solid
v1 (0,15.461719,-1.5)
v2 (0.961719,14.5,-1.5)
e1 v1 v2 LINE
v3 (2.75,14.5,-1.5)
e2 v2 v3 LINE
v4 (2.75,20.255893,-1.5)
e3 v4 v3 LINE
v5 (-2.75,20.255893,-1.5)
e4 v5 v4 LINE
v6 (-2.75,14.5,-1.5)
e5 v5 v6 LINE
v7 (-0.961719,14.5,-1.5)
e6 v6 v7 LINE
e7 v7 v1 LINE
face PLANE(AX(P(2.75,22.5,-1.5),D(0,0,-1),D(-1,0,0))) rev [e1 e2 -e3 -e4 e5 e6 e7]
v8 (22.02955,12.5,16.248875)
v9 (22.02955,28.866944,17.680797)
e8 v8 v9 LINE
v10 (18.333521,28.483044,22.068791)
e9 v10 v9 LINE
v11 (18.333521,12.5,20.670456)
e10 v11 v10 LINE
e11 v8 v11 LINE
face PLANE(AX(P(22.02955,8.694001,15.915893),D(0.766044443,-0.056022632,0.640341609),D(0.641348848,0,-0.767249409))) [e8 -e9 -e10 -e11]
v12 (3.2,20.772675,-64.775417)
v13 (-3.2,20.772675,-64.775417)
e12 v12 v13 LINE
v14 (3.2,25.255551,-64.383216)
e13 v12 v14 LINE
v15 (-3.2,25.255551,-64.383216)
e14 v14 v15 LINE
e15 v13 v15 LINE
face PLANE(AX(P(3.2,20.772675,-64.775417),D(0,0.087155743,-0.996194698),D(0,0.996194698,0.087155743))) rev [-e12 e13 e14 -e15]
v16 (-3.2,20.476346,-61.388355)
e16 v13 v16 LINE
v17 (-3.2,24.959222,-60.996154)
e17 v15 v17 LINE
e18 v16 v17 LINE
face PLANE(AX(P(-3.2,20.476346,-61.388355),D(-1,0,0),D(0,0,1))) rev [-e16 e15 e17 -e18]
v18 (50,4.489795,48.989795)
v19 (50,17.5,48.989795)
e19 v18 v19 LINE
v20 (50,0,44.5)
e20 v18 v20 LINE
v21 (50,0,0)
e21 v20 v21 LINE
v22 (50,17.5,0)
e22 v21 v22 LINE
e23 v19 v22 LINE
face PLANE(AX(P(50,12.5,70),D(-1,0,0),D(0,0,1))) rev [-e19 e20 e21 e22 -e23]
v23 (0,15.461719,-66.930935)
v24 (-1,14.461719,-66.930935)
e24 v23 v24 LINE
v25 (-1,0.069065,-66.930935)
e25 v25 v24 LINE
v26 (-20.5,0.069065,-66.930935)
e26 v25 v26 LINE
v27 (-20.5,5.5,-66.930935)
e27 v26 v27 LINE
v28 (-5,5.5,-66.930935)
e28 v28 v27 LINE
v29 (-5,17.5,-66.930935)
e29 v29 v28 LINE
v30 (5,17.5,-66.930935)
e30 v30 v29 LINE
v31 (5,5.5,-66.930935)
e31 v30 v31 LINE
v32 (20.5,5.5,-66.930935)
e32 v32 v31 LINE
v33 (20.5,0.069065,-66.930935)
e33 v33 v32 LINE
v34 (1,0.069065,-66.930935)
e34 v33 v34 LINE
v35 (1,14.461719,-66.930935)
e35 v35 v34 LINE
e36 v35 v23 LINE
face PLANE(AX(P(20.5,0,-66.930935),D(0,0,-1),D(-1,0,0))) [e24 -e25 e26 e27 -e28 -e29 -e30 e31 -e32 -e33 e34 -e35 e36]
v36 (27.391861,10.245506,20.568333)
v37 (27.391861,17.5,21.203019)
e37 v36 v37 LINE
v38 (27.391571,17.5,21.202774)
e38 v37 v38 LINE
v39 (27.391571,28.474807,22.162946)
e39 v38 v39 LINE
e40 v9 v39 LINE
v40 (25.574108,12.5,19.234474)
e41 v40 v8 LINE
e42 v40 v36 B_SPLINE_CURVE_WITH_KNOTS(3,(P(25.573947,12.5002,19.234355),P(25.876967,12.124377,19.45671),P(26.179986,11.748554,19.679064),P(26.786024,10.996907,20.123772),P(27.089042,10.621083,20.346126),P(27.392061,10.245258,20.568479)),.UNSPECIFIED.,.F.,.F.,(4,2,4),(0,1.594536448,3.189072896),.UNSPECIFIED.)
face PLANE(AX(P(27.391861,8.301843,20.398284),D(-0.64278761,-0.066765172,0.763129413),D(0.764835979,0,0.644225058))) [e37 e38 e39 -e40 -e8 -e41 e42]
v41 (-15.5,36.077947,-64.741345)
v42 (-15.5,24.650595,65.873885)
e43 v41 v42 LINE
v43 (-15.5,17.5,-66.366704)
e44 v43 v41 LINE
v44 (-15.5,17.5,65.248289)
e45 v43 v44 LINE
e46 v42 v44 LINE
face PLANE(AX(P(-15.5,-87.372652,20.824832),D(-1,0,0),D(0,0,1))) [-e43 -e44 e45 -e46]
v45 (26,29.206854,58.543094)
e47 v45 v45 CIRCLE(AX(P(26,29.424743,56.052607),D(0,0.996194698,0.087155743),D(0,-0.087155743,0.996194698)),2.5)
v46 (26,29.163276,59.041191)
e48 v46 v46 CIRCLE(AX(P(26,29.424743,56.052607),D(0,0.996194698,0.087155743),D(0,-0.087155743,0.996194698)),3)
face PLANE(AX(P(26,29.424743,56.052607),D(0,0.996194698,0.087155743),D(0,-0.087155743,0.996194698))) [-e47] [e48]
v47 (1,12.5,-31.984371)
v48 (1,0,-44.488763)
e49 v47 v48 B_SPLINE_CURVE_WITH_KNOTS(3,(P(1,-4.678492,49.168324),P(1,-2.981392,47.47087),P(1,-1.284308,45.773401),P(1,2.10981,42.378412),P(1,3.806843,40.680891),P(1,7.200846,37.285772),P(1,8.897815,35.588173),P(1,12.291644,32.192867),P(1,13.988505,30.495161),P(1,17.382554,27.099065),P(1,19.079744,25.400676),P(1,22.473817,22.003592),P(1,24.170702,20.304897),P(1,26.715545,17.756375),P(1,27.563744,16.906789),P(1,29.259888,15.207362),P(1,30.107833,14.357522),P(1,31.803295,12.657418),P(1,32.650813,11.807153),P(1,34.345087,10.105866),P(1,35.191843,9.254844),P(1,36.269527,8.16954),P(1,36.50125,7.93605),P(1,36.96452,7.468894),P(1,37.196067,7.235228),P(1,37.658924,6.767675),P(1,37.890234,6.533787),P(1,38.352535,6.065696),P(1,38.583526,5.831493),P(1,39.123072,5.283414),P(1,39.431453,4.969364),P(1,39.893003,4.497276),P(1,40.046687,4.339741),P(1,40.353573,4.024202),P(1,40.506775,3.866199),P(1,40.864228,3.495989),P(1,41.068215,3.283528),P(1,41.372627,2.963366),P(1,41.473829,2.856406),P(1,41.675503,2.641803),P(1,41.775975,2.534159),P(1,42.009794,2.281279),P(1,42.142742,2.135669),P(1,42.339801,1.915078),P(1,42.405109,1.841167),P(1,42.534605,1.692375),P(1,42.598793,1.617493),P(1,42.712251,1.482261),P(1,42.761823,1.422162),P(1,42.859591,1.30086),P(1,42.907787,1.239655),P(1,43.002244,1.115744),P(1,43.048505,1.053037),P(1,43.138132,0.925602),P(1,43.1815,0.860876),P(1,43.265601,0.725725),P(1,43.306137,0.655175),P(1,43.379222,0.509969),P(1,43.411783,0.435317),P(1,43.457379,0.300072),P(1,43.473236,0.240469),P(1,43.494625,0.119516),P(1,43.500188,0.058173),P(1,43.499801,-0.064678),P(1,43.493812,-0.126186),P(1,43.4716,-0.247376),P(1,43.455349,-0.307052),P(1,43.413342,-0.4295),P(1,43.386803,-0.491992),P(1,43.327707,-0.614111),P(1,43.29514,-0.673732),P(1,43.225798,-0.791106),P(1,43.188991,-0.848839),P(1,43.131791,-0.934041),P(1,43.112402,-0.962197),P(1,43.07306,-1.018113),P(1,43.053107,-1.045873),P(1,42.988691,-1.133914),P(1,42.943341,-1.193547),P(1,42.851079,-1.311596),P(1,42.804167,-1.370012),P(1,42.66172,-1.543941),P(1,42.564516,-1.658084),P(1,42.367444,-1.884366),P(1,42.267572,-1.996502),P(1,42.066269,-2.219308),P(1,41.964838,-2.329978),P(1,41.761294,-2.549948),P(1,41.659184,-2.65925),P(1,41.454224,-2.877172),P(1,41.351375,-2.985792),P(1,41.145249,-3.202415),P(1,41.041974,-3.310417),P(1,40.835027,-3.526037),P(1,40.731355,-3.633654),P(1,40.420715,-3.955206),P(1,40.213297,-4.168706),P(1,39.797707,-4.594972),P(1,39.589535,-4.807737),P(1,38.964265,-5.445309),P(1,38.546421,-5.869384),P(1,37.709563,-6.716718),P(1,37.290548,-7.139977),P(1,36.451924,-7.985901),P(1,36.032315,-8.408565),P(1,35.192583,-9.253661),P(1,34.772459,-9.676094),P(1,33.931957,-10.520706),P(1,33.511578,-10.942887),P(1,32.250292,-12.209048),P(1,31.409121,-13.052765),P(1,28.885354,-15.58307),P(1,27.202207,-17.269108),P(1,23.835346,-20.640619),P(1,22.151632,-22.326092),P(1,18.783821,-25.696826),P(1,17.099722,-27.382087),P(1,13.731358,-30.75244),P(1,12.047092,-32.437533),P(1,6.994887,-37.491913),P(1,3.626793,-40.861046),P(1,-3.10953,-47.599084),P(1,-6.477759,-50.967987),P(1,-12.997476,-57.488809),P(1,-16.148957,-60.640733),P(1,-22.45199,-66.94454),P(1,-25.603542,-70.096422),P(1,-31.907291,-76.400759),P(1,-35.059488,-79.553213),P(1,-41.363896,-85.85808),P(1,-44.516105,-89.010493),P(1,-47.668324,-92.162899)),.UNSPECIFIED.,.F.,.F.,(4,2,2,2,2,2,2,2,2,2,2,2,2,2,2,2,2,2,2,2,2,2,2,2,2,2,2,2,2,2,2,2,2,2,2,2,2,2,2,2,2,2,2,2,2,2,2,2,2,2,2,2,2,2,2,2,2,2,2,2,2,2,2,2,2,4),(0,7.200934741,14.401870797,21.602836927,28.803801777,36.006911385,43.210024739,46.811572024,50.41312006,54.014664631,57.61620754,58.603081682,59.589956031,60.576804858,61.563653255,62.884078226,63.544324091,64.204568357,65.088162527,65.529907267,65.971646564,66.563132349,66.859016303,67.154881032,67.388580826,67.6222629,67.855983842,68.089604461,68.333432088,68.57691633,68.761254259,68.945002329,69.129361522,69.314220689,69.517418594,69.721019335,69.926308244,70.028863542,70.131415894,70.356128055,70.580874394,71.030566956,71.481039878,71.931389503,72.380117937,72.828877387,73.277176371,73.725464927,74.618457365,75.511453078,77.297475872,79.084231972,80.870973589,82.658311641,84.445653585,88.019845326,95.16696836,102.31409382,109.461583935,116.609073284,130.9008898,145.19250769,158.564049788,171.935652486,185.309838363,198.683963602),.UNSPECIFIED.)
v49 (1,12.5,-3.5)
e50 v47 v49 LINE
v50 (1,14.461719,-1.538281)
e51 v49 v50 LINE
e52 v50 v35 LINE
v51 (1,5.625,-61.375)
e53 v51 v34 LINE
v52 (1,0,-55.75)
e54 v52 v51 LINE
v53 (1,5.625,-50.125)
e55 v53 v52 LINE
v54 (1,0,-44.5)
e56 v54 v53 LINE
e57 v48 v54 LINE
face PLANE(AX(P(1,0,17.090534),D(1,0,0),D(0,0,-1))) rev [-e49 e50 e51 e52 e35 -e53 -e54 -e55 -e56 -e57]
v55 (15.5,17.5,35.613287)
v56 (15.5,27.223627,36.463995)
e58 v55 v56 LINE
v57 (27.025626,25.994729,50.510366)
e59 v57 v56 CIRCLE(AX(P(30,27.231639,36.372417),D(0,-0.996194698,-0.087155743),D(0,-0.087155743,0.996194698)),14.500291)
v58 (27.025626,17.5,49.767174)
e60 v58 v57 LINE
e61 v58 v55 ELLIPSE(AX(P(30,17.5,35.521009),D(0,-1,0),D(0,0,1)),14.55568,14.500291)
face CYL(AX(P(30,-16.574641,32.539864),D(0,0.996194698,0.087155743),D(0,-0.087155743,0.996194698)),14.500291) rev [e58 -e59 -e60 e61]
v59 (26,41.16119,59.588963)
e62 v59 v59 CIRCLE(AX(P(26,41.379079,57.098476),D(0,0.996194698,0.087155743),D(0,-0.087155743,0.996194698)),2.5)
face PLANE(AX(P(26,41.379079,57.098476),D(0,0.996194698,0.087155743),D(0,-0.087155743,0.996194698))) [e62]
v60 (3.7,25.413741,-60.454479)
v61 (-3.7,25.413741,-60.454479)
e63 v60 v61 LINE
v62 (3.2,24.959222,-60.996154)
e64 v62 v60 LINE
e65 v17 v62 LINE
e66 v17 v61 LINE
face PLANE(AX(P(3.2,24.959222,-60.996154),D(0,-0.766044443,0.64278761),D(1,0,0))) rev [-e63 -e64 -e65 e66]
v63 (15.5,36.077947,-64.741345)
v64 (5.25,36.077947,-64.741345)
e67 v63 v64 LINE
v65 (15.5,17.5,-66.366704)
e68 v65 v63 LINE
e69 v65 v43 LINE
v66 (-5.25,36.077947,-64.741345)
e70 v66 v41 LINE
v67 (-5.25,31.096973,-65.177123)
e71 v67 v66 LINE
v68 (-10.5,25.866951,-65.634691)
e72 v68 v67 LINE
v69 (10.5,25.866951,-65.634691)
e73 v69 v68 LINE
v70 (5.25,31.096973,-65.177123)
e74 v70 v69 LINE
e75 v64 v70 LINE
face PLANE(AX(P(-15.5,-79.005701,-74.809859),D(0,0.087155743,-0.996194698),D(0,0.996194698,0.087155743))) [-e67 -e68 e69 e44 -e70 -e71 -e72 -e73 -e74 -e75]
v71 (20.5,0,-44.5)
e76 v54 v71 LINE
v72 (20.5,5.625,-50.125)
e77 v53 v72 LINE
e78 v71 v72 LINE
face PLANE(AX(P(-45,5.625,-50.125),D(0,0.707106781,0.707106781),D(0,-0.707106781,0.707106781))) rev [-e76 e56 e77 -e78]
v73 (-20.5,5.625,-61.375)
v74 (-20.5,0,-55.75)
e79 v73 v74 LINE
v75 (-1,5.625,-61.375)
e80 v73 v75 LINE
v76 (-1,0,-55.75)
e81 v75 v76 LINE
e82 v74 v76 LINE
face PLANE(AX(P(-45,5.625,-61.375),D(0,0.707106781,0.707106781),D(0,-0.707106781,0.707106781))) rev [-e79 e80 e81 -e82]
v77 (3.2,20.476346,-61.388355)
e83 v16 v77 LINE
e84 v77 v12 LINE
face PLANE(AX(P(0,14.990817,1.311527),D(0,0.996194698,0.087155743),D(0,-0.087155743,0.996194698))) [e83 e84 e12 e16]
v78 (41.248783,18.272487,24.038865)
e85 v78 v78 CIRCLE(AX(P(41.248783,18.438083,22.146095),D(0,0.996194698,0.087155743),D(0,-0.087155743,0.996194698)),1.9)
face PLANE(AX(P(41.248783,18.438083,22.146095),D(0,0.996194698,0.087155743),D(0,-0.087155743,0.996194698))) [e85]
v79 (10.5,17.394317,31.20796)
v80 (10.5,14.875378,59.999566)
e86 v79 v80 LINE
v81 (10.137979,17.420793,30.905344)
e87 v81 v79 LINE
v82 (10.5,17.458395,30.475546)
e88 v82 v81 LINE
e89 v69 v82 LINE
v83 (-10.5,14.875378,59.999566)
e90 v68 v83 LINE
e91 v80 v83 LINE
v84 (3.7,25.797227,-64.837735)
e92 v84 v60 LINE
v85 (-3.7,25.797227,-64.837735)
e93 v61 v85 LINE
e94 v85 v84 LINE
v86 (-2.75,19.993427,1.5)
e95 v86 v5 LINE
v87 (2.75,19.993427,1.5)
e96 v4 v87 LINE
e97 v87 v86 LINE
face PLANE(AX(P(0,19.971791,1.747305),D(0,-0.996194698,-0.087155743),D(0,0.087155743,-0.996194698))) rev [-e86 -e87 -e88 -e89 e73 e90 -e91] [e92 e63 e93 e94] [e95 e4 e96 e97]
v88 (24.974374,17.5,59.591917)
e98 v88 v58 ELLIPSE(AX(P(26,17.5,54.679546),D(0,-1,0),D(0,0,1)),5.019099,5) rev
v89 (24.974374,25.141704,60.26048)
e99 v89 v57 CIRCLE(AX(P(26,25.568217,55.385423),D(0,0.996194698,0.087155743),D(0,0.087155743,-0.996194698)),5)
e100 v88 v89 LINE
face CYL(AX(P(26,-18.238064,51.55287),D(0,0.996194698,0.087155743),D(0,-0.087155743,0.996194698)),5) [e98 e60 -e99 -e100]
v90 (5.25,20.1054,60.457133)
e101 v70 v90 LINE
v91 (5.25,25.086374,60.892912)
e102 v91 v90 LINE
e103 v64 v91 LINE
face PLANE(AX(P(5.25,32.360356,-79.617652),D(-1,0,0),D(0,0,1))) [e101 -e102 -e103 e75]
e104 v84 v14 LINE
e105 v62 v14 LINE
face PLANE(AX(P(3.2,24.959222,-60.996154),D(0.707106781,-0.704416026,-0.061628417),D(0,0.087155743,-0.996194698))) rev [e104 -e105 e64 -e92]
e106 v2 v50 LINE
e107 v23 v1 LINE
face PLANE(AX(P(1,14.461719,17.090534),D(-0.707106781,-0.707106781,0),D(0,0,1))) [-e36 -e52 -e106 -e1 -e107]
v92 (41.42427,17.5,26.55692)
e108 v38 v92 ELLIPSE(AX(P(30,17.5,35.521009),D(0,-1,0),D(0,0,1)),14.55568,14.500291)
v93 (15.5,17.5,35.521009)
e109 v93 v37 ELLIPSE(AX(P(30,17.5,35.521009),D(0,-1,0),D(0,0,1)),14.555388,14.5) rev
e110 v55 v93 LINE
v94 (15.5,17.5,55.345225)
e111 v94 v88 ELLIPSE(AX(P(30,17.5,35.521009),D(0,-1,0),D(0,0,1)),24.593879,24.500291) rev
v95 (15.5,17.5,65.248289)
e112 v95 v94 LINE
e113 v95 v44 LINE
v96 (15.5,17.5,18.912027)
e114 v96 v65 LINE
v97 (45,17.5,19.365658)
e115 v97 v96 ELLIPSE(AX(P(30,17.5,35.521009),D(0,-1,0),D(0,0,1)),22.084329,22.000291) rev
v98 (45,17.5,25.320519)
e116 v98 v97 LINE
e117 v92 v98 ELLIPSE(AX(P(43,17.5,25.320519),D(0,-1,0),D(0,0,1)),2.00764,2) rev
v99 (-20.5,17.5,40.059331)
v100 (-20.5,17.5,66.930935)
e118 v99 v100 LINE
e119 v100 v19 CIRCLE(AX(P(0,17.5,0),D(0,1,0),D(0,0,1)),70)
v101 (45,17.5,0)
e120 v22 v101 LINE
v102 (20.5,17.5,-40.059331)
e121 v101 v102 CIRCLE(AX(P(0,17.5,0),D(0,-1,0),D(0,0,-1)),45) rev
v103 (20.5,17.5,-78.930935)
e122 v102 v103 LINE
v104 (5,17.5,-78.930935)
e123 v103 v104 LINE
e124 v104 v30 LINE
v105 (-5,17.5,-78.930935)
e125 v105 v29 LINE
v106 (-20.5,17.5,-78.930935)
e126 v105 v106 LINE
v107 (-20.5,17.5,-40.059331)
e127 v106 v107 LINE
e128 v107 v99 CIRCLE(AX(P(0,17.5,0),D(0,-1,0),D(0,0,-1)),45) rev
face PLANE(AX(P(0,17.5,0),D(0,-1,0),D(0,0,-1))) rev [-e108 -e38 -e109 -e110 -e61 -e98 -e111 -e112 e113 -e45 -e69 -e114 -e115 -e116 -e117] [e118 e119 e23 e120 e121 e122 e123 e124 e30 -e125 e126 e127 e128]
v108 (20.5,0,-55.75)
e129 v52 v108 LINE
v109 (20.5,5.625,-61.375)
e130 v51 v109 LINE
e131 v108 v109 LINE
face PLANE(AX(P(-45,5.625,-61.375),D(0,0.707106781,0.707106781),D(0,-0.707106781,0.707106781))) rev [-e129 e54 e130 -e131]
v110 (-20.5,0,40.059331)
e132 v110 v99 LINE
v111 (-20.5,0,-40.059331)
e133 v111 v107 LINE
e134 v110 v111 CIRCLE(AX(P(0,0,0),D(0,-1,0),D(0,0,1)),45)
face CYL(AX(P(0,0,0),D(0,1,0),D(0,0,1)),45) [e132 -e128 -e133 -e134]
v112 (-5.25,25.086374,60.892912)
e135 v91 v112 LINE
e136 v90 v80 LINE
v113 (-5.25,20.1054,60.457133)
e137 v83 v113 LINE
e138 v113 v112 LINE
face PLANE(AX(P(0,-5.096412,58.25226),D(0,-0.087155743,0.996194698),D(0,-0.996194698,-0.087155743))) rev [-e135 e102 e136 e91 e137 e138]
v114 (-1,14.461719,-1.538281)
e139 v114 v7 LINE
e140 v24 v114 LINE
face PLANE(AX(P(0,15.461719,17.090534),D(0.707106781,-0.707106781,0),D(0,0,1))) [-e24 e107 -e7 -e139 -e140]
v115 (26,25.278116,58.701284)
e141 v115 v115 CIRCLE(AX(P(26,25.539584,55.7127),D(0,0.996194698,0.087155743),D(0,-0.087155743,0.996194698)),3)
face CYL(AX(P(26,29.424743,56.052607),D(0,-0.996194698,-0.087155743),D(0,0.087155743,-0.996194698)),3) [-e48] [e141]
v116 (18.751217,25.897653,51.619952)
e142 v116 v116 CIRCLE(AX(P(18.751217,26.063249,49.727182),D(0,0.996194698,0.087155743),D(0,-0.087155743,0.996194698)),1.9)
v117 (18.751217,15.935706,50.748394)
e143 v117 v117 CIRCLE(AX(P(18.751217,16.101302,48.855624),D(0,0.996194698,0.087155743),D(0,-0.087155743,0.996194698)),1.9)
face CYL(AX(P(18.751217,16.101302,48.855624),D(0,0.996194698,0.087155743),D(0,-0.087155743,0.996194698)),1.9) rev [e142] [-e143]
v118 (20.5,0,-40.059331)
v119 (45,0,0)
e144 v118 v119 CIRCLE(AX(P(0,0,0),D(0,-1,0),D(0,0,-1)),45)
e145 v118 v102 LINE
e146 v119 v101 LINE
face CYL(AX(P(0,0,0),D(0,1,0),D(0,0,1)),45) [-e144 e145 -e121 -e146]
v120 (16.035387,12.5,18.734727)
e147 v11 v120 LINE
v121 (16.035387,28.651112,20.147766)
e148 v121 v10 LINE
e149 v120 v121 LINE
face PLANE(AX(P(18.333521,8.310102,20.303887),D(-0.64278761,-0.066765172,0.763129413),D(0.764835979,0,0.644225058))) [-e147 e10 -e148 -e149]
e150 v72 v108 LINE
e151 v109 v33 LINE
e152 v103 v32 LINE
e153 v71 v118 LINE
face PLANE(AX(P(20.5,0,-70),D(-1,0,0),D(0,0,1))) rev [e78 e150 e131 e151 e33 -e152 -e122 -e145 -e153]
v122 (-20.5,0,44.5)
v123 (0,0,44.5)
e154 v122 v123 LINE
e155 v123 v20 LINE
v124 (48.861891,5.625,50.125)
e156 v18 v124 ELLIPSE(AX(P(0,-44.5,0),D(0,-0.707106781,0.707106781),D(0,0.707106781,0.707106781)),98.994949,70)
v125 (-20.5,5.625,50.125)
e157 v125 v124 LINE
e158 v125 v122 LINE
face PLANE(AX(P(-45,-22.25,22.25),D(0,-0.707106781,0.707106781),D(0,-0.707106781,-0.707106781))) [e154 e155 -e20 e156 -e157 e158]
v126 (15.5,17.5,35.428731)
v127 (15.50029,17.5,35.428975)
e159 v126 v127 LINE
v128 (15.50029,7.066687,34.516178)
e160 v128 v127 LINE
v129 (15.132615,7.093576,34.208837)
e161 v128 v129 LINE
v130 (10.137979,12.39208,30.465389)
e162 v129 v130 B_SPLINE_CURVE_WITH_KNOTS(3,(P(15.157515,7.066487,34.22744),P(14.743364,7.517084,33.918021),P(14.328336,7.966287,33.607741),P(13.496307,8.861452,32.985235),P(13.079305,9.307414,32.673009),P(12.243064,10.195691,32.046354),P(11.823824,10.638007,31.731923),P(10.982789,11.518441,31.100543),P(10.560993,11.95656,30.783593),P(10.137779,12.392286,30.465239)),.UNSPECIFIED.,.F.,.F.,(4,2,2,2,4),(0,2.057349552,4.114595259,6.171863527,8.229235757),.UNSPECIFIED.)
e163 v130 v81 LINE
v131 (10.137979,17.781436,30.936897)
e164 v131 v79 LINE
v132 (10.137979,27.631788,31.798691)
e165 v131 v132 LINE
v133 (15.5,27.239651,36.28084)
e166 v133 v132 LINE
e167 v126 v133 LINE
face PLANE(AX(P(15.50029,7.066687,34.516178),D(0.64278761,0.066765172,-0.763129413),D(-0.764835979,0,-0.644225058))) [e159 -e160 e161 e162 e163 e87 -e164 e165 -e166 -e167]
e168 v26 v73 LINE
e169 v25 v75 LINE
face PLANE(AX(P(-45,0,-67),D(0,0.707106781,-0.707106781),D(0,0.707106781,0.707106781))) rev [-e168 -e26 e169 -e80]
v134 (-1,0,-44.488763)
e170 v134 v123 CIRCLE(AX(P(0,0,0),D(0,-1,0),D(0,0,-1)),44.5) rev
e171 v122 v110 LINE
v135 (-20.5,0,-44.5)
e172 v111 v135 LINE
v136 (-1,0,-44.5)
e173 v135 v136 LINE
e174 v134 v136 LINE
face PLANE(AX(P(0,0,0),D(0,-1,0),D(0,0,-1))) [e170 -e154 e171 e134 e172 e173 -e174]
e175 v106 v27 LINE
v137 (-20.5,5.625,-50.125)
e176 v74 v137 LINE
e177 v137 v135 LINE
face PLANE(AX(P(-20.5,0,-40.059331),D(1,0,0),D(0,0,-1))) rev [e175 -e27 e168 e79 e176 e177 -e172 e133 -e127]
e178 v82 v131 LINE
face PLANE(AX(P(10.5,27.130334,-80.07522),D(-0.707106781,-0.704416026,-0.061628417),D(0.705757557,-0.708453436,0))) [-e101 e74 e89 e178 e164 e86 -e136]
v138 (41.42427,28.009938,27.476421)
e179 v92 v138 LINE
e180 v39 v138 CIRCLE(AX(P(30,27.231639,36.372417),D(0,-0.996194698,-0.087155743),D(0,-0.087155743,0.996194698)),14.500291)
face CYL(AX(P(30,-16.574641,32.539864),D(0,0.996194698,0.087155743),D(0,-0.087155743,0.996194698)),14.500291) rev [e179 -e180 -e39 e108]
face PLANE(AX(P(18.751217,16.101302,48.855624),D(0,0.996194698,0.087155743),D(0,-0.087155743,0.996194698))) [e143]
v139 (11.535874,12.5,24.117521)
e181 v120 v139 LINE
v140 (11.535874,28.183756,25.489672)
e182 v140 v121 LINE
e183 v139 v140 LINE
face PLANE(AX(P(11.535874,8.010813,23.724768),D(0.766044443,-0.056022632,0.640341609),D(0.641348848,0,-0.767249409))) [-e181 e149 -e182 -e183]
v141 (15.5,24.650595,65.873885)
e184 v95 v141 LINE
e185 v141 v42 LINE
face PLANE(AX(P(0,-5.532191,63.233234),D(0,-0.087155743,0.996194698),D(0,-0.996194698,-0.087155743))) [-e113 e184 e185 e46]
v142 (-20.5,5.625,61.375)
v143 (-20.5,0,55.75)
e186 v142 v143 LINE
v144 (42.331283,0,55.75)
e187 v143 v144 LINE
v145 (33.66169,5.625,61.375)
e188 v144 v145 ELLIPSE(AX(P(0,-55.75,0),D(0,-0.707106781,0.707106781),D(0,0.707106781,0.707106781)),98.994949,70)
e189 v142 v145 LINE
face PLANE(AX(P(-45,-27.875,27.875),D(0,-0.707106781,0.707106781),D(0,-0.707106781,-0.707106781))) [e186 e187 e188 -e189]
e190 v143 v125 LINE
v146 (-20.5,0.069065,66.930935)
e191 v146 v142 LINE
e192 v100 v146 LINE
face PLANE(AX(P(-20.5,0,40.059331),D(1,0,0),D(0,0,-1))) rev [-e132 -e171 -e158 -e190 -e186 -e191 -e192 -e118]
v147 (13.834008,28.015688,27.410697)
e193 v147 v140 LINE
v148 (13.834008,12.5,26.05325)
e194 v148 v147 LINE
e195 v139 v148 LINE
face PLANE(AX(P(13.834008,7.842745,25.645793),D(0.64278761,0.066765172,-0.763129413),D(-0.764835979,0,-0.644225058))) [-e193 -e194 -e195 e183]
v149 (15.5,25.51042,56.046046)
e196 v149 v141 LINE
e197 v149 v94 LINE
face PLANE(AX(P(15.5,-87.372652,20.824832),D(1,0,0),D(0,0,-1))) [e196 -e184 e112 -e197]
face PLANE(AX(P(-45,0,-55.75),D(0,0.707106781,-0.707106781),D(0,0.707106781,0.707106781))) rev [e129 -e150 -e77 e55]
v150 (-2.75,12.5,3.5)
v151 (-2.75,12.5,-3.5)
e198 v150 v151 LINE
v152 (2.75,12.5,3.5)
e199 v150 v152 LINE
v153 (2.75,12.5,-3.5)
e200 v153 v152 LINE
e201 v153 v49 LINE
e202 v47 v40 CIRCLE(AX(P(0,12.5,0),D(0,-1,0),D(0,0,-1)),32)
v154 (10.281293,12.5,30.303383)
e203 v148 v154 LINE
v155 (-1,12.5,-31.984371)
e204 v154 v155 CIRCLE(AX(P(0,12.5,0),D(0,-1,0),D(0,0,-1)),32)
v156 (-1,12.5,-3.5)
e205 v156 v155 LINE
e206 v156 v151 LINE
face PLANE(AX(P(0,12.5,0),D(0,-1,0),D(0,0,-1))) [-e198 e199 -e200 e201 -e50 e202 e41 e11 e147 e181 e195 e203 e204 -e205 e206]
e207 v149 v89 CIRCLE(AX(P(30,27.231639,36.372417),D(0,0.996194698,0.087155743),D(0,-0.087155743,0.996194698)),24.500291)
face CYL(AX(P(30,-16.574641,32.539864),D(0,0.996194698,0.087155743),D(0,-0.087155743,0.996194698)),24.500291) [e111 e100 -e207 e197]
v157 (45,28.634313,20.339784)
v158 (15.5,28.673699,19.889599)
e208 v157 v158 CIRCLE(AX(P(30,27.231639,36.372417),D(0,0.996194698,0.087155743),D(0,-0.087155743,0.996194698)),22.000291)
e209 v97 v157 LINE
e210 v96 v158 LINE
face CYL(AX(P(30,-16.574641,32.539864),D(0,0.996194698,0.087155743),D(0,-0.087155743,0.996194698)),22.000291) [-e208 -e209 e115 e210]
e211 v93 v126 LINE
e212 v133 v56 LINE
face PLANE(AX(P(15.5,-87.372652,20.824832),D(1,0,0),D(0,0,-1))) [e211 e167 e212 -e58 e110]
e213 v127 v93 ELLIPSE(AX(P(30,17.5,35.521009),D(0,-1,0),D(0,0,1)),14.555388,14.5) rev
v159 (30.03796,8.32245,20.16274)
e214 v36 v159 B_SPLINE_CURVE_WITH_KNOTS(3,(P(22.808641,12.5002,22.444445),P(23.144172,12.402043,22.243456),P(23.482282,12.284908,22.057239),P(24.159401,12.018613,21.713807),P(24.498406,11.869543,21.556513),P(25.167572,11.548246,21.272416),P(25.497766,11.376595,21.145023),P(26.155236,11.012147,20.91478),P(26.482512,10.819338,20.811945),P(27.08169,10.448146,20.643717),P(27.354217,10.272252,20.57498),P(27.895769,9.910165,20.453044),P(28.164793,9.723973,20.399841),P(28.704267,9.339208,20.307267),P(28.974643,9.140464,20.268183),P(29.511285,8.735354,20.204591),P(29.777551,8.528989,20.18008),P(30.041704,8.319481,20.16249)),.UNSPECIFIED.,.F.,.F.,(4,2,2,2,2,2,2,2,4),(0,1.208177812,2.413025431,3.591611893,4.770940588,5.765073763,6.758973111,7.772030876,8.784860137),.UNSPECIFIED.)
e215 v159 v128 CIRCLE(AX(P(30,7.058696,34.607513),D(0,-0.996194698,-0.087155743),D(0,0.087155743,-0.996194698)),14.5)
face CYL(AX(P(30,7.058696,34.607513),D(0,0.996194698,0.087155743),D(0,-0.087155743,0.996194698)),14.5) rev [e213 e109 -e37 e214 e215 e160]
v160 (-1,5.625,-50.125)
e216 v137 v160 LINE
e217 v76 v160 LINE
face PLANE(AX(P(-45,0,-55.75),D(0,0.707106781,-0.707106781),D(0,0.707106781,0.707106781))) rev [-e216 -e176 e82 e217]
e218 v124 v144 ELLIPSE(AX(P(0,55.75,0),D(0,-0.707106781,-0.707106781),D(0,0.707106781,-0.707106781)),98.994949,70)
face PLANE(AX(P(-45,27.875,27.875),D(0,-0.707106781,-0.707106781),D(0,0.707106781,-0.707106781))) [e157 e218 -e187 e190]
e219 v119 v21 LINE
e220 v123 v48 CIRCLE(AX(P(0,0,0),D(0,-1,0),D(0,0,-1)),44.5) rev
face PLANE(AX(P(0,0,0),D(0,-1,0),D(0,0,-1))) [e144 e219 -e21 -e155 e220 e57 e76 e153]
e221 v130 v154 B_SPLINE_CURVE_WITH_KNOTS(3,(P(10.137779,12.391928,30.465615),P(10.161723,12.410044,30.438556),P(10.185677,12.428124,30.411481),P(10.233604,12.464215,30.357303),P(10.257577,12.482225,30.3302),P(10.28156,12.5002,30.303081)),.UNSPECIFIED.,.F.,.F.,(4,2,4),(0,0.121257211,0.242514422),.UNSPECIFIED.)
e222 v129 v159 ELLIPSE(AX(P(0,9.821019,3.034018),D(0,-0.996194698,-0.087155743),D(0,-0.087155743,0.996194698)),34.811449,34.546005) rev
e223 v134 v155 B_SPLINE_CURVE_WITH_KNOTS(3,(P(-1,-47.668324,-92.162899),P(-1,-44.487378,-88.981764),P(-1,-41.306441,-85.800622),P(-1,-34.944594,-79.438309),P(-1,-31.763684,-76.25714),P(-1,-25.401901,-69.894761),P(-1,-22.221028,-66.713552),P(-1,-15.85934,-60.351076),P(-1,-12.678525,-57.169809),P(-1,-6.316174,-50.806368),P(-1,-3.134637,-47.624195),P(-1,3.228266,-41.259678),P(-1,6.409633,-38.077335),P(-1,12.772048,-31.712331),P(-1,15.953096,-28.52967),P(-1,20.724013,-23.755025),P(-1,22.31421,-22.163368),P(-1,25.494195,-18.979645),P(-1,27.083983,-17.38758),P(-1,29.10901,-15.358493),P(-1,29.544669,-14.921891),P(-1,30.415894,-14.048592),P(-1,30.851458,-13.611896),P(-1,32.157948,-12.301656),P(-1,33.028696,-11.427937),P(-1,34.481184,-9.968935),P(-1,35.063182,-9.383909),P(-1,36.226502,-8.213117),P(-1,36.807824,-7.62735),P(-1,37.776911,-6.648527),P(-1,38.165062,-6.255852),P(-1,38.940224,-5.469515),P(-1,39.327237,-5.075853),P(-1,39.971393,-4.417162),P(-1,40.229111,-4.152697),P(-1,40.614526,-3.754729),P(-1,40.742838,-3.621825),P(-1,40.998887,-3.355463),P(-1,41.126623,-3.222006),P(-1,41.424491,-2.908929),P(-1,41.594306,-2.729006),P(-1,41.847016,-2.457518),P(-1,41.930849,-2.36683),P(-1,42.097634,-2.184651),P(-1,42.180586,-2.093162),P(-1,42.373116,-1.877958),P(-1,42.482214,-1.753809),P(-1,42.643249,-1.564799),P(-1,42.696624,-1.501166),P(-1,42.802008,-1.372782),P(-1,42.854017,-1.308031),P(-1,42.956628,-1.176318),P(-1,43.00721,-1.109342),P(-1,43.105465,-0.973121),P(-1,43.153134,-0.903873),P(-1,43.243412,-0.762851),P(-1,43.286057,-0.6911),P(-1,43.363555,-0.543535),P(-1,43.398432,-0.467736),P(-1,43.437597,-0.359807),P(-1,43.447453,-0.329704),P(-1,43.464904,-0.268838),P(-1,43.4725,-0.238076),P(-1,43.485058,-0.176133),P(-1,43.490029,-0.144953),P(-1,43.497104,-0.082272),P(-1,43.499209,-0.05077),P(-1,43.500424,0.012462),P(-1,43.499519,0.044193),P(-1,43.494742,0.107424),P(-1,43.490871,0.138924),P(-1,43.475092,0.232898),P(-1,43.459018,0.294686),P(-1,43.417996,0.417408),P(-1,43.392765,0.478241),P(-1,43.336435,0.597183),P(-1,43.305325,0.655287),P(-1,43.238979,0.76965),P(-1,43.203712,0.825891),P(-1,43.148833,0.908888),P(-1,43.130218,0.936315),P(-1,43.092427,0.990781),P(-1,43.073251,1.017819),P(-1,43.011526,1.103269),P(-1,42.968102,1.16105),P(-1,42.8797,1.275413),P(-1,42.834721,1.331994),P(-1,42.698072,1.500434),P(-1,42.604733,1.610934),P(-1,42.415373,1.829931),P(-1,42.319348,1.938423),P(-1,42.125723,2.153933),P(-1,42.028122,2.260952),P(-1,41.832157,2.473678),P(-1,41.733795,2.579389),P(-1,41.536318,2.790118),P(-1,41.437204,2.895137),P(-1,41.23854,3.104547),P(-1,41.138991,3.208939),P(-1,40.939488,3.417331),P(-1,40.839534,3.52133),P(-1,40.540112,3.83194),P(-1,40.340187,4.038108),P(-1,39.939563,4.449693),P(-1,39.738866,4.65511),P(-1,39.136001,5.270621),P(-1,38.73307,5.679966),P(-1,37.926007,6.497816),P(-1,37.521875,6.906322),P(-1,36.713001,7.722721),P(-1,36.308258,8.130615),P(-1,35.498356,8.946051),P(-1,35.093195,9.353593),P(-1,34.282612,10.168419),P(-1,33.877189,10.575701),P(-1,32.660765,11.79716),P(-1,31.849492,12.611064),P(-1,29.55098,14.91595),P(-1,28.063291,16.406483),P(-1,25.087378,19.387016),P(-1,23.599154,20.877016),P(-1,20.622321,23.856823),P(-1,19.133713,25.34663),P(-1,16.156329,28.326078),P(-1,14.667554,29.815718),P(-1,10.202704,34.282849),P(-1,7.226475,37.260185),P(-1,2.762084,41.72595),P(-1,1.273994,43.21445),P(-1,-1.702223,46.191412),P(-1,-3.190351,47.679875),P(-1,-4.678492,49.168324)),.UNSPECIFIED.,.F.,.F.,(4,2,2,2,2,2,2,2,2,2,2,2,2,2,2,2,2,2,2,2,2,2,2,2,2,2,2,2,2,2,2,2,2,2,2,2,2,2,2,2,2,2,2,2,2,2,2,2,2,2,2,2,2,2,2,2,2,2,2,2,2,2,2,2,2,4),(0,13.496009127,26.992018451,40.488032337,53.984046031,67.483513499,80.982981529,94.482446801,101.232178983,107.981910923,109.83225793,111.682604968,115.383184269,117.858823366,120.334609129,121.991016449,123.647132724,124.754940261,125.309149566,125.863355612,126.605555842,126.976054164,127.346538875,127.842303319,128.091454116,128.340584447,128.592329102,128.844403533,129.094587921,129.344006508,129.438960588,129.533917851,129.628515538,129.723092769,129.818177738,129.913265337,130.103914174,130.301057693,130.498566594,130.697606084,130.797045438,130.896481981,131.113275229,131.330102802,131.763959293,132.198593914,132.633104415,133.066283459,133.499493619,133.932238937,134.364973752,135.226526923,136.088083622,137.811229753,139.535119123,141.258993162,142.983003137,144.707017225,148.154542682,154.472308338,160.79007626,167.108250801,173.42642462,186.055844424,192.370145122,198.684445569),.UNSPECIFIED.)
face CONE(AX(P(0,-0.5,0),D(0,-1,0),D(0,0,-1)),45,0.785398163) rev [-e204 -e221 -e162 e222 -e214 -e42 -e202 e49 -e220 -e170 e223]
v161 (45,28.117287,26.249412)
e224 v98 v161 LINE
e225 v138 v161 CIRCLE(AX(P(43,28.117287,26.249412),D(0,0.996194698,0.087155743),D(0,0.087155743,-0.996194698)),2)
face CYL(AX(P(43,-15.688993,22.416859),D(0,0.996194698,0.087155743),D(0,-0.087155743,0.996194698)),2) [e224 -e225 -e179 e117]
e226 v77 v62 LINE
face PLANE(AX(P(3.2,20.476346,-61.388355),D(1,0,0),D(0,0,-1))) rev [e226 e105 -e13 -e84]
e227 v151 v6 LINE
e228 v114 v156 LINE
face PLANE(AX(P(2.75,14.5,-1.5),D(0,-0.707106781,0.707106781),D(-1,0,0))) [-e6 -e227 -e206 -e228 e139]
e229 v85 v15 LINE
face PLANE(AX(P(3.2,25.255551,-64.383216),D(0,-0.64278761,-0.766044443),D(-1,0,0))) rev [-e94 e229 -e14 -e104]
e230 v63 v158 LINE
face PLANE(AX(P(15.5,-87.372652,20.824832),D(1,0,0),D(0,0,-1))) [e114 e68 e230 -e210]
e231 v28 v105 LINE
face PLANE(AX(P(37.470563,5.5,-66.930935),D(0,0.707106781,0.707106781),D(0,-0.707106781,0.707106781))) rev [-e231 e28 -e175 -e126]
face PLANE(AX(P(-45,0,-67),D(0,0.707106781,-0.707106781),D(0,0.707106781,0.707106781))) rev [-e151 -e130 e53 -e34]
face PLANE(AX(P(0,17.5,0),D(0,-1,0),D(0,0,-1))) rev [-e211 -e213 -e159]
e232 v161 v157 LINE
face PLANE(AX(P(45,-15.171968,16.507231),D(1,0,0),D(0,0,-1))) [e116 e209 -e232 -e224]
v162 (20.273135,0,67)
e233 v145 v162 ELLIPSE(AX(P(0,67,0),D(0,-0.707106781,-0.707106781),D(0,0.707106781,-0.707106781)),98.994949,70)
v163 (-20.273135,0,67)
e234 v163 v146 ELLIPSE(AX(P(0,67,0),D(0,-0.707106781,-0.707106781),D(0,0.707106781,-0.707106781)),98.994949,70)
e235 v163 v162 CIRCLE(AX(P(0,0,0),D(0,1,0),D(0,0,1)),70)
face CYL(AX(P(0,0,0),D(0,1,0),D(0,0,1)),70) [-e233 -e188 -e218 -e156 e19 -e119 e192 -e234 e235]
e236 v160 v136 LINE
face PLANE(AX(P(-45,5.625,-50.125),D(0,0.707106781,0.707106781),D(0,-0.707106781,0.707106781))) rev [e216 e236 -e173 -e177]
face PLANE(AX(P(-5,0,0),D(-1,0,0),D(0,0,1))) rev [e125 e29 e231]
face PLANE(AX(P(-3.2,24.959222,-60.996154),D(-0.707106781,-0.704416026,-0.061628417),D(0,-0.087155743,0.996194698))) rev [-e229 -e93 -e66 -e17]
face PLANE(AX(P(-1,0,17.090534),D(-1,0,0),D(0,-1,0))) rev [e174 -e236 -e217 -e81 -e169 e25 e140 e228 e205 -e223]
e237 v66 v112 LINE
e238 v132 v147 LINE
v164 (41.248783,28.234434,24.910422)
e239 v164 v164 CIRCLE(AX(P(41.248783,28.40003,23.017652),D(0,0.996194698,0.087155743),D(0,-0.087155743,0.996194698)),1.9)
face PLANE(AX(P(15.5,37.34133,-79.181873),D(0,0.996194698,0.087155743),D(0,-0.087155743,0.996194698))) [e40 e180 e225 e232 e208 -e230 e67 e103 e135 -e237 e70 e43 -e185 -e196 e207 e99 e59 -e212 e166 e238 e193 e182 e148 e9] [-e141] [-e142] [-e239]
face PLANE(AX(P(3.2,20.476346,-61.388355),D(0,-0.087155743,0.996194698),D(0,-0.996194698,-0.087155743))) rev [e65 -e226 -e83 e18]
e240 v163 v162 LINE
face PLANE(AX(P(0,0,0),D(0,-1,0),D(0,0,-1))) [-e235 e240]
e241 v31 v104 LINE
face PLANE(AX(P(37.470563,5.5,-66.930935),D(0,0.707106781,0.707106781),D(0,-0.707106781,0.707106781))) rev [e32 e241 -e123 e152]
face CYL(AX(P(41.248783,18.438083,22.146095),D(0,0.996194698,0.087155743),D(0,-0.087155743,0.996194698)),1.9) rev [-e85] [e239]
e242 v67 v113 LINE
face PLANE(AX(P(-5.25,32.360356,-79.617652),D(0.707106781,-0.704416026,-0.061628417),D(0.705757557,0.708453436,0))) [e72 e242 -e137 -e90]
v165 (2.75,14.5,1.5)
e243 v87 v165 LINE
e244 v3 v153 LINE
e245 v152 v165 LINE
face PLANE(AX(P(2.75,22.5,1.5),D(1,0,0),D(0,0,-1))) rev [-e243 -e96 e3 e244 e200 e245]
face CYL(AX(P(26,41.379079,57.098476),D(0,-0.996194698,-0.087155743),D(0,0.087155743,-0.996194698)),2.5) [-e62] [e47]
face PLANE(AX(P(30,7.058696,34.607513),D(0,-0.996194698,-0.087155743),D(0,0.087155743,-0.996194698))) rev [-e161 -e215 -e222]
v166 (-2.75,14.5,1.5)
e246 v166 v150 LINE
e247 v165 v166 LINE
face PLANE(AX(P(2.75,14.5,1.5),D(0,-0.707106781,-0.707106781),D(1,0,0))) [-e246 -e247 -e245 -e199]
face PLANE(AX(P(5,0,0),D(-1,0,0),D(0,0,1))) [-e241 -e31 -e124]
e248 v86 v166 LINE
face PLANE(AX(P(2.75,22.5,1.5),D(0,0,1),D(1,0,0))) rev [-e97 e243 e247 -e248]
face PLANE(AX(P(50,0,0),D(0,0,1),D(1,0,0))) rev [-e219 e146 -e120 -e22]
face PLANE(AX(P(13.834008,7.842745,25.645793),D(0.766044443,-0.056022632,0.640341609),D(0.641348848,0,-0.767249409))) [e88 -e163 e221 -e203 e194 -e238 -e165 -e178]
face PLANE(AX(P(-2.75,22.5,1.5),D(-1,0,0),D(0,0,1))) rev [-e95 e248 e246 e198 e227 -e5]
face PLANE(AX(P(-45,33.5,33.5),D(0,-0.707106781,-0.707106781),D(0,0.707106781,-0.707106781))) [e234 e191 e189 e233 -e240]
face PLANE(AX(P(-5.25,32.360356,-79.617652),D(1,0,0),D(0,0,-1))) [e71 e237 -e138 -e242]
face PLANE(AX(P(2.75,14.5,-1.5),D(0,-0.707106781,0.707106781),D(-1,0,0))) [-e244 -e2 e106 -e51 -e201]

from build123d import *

# Parameters (mm, degrees)
ESQUISSE1_W                     = 100
ESQUISSE1_H                     = 140
ESQUISSE1_R                     = 45
BOSS_EXTRU_1_DEPTH              = 12.5
ESQUISSE3_W                     = 100
ESQUISSE3_H                     = 140
BOSS_EXTRU_2_DEPTH              = 5
BOSS_EXTRU_6_REACH              = 196.163
ESQUISSE15_W                    = 31
ESQUISSE15_H                    = 96
BOSS_EXTRU_3_DEPTH              = 60
BOSS_EXTRU_3_DIRECTION_2_REACH  = 94.681
ESQUISSE7_W                     = 31
ESQUISSE7_H                     = 7.615352471
BOSS_EXTRU_4_DEPTH              = 5
ENL_V_MAT_EXTRU_3_DEPTH         = 126.114159057
CHANFREIN1_SIZE                 = 13
ESQUISSE18_W                    = 5.5
ESQUISSE18_H                    = 3
ENL_V_MAT_EXTRU_5_DEPTH         = 10
CHANFREIN2_SIZE                 = 2
ENL_V_MAT_EXTRU_1_DEPTH         = 89.006477678
ENL_V_MAT_EXTRU_1_DEPTH_BACK    = 89.006477678
ENL_V_MAT_EXTRU_2_DEPTH         = 94.282464894
ENL_V_MAT_EXTRU_2_DEPTH_BACK    = 94.282464894
ESQUISSE17_W                    = 6.4
ESQUISSE17_H                    = 3.4
ENL_V_MAT_EXTRU_4_DEPTH         = 5
CHANFREIN3_SIZE                 = 0.5
ESQUISSE19_OUTSIDE_W            = 131.598
ESQUISSE19_OUTSIDE_H            = 176.598
ENL_V_MAT_EXTRU_6_DEPTH         = 89.006477678
ENL_V_MAT_EXTRU_7_DEPTH         = 10
ENL_V_MAT_EXTRU_7_DEPTH_BACK    = 88.26725067
BOSS_EXTRU_7_REACH              = 92.836
ESQUISSE22_R                    = 1.9
ENL_V_MAT_EXTRU_8_DEPTH         = 10
ESQUISSE23_R                    = 3
BOSS_EXTRU_8_DEPTH              = 3.9
ESQUISSE24_R                    = 2.5
BOSS_EXTRU_9_DEPTH              = 12
BOSS_EXTRU_10_REACH             = 97.553
BOSS_EXTRU_10_DIRECTION_2_REACH = 97.553
ENL_V_MAT_EXTRU_10_DEPTH        = 5
ENL_V_MAT_EXTRU_10_DEPTH_BACK   = 5
ENL_V_MAT_EXTRU_11_REACH        = 153.593
ESQUISSE27_W                    = 2
ESQUISSE27_H                    = 15.461719317
CHANFREIN4_SIZE                 = 1


# Some blends are built 0.0001 mm under size
with BuildPart() as part:
    # Esquisse1 → Boss.-Extru.1 (new body)
    with BuildSketch(Plane(origin=(0, 0, 0), x_dir=(1, 0, 0), z_dir=(0, 1, 0))):
        Rectangle(ESQUISSE1_W, ESQUISSE1_H)
        with Locations(Location((0, 0, 0), (0, 0, 270))):
            Circle(ESQUISSE1_R, mode=Mode.SUBTRACT)
    extrude(amount=BOSS_EXTRU_1_DEPTH)

    # Esquisse3 → Boss.-Extru.2 (add)
    with BuildSketch(Plane(origin=(0, 12.5, 0), x_dir=(1, 0, 0), z_dir=(0, 1, 0))):
        Rectangle(ESQUISSE3_W, ESQUISSE3_H)
    extrude(amount=BOSS_EXTRU_2_DEPTH)

    # Boss.-Extru.6: up to this face of the body (flat: up to its plane)
    boss_extru_6_end = Plane(part.part.faces().sort_by_distance((0, 17.5, 0))[0])
    # Esquisse15 → Boss.-Extru.6 (add, up to the picked face)
    with BuildSketch(Plane(origin=(0, 9.857399497, 117.355323483), x_dir=(1, 0, 0), z_dir=(0, 0.9961946980917459, 0.08715574274765504)), mode=Mode.PRIVATE) as boss_extru_6_sk1:
        with Locations((0, 135.689006627)):
            Rectangle(ESQUISSE15_W, ESQUISSE15_H)
    boss_extru_6_tool1 = split(extrude(boss_extru_6_sk1.sketch, amount=-BOSS_EXTRU_6_REACH, mode=Mode.PRIVATE), bisect_by=boss_extru_6_end, keep=Keep.BOTH, mode=Mode.PRIVATE)
    add(boss_extru_6_tool1.solids().sort_by(Axis((0, 21.683476, -17.817346), (0, -0.9961946980917459, -0.08715574274765504)))[0])

    # Esquisse6 → Boss.-Extru.3 (add)
    with BuildSketch(Plane(origin=(0, -4.423503026, -1.91805798), x_dir=(1, 0, 0), z_dir=(0, -0.08715574274765504, 0.9961946980917459))):
        Polygon((15.5, 24.621919528), (10.5, 24.621919528), (5.25, 29.871919528), (5.25, 34.871919528), (15.5, 34.871919528), align=None)
        Polygon((-5.25, 29.871919528), (-5.25, 34.871919528), (-15.5, 34.871919528), (-15.5, 24.621919528), (-10.5, 24.621919528), align=None)
    extrude(amount=BOSS_EXTRU_3_DEPTH)

    # Boss.-Extru.3 direction 2: up to this face of the body (flat: up to its plane)
    boss_extru_3_direction_2_end = Plane(part.part.faces().sort_by_distance((0, 21.683475652, -66.00069771))[0])
    # Esquisse6 → Boss.-Extru.3 direction 2 (add, up to the picked face)
    with BuildSketch(Plane(origin=(0, -4.423503026, -1.91805798), x_dir=(1, 0, 0), z_dir=(0, -0.08715574274765504, 0.9961946980917459)), mode=Mode.PRIVATE) as boss_extru_3_direction_2_sk1:
        Polygon((15.5, 24.621919528), (10.5, 24.621919528), (5.25, 29.871919528), (5.25, 34.871919528), (15.5, 34.871919528), align=None)
    boss_extru_3_direction_2_tool1 = split(extrude(boss_extru_3_direction_2_sk1.sketch, amount=-BOSS_EXTRU_3_DIRECTION_2_REACH, mode=Mode.PRIVATE), bisect_by=boss_extru_3_direction_2_end, keep=Keep.BOTH, mode=Mode.PRIVATE)
    # Esquisse6 → Boss.-Extru.3 direction 2 (add, up to the picked face)
    with BuildSketch(Plane(origin=(0, -4.423503026, -1.91805798), x_dir=(1, 0, 0), z_dir=(0, -0.08715574274765504, 0.9961946980917459)), mode=Mode.PRIVATE) as boss_extru_3_direction_2_sk2:
        Polygon((-5.25, 29.871919528), (-5.25, 34.871919528), (-15.5, 34.871919528), (-15.5, 24.621919528), (-10.5, 24.621919528), align=None)
    boss_extru_3_direction_2_tool2 = split(extrude(boss_extru_3_direction_2_sk2.sketch, amount=-BOSS_EXTRU_3_DIRECTION_2_REACH, mode=Mode.PRIVATE), bisect_by=boss_extru_3_direction_2_end, keep=Keep.BOTH, mode=Mode.PRIVATE)
    add(boss_extru_3_direction_2_tool1.solids().sort_by(Axis((10.884543, 25.717824, 0.718966), (0, 0.08715574274765504, -0.9961946980917459)))[0])
    add(boss_extru_3_direction_2_tool2.solids().sort_by(Axis((-10.884543, 25.717824, 0.718966), (0, 0.08715574274765504, -0.9961946980917459)))[0])

    # Esquisse7 → Boss.-Extru.4 (add)
    with BuildSketch(Plane(origin=(0, -5.096412404, 58.252260331), x_dir=(1, 0, 0), z_dir=(0, -0.08715574274765515, 0.9961946980917459))):
        with Locations((0, 26.490403264)):
            Rectangle(ESQUISSE7_W, ESQUISSE7_H)
    extrude(amount=BOSS_EXTRU_4_DEPTH)

    # Esquisse16 → Enlèv. mat.-Extru.3 (cut)
    with BuildSketch(Plane(origin=(0, 5.8951608, -67.381996276), x_dir=(-1, 0, 0), z_dir=(0, 0.0871557427476551, -0.9961946980917459))):
        Polygon((-10.5, 20.048079499), (-5.25, 25.298079499), (-5.25, 30.298079499), (5.25, 30.298079499), (5.25, 25.298079499), (10.5, 20.048079499), align=None)
    extrude(amount=-ENL_V_MAT_EXTRU_3_DEPTH, mode=Mode.SUBTRACT)

    # Chanfrein1
    # the kernel refuses this chamfer: 13 mm, written as the material it adds along each edge
    with BuildSketch(Plane(origin=(0, 12.5, 0), x_dir=(0, 0, 1), z_dir=(-1, 0, 0))) as chanfrein1_piece_1_section:
        Polygon((45, -CHANFREIN1_SIZE), (45 - CHANFREIN1_SIZE, 0), (45, 0), align=None)
    chanfrein1_piece_1 = revolve(axis=Axis((0, 12.5, 0), (0, 1, 0)), mode=Mode.PRIVATE)
    chanfrein1_piece_1 = split(chanfrein1_piece_1, bisect_by=Plane(origin=(0, 0, -38.269047207), z_dir=(0, 1, 0)), keep=Keep.TOP, mode=Mode.PRIVATE)
    add(chanfrein1_piece_1)

    # Esquisse18 → Enlèv. mat.-Extru.5 (cut)
    with BuildSketch(Plane(origin=(0, 12.5, 0), x_dir=(-1, 0, 0), z_dir=(0, -1, 0))):
        Rectangle(ESQUISSE18_W, ESQUISSE18_H)
    extrude(amount=-ENL_V_MAT_EXTRU_5_DEPTH, mode=Mode.SUBTRACT)

    # Chanfrein2
    chanfrein2_edges = [part.edges().sort_by_distance(p)[0] for p in [
        (0, 12.5, -1.5),
        (0, 12.5, 1.5),
    ]]
    chamfer(chanfrein2_edges, length=CHANFREIN2_SIZE)

    # Esquisse12 → Enlèv. mat.-Extru.1 (cut, two sides: drawn at the far end of the back side and taken through both)
    with BuildSketch(Plane(origin=(0, 17.5, 0), x_dir=(1, 0, 0), z_dir=(0, 1, 0)).offset(-ENL_V_MAT_EXTRU_1_DEPTH_BACK)):
        with BuildLine():
            Line((-50, 70), (-50, -70))
            Line((-50, -70), (-20.5, -70))
            Line((-20.5, -70), (-20.5, -40.059330998))
            ThreePointArc((-20.5, -40.059330998), (-45, 0), (-20.5, 40.059330998))
            Line((-20.5, 40.059330998), (-20.5, 70))
            Line((-20.5, 70), (-50, 70))
        make_face()
        with BuildLine():
            Line((50, 70), (20.5, 70))
            Line((20.5, 70), (20.5, 40.059330998))
            ThreePointArc((20.5, 40.059330998), (38.389451676, 23.478713764), (45, 0))
            Line((45, 0), (50, 0))
            Line((50, 0), (50, 70))
        make_face()
    extrude(amount=ENL_V_MAT_EXTRU_1_DEPTH + ENL_V_MAT_EXTRU_1_DEPTH_BACK, mode=Mode.SUBTRACT)

    # Esquisse13 → Enlèv. mat.-Extru.2 (cut, two sides: drawn at the far end of the back side and taken through both)
    with BuildSketch(Plane(origin=(0, 0, 0), x_dir=(0, 0, -1), z_dir=(1, 0, 0)).offset(-ENL_V_MAT_EXTRU_2_DEPTH_BACK)):
        Polygon((-55.75, 0), (-50.125, 5.625), (-44.5, 0), align=None)
        Polygon((-67, 0), (-61.375, 5.625), (-55.75, 0), align=None)
        Polygon((55.75, 0), (50.125, 5.625), (44.5, 0), align=None)
        Polygon((67, 0), (55.75, 0), (61.375, 5.625), align=None)
    extrude(amount=ENL_V_MAT_EXTRU_2_DEPTH + ENL_V_MAT_EXTRU_2_DEPTH_BACK, mode=Mode.SUBTRACT)

    # Esquisse17 → Enlèv. mat.-Extru.4 (cut)
    with BuildSketch(Plane(origin=(0, 19.971790504, 1.747305259), x_dir=(1, 0, 0), z_dir=(0, 0.9961946980917459, 0.08715574274765504))):
        with Locations((0, 64.639384555)):
            Rectangle(ESQUISSE17_W, ESQUISSE17_H)
    extrude(amount=-ENL_V_MAT_EXTRU_4_DEPTH, mode=Mode.SUBTRACT)

    # Chanfrein3
    chanfrein3_edges = [part.edges().sort_by_distance(p)[0] for p in [
        (-3.2, 25.605484076, -62.646106923),
        (0, 25.457319313, -60.952575936),
        (3.2, 25.605484076, -62.646106923),
        (0, 25.753648838, -64.339637909),
    ]]
    chamfer(chanfrein3_edges, length=CHANFREIN3_SIZE)

    # Esquisse19 outside → Enlèv. mat.-Extru.6 (cut, through all)
    with BuildSketch(Plane(origin=(0, 17.5, 0), x_dir=(1, 0, 0), z_dir=(0, 1, 0))):
        with Locations((2.5, 0)):
            Rectangle(ESQUISSE19_OUTSIDE_W, ESQUISSE19_OUTSIDE_H)
        with BuildLine():
            Line((20.5, 66.930934552), (-20.5, 66.930934552))
            ThreePointArc((-20.5, 66.930934552), (0, -70), (20.5, 66.930934552))
        make_face(mode=Mode.SUBTRACT)
    extrude(amount=-ENL_V_MAT_EXTRU_6_DEPTH, mode=Mode.SUBTRACT)

    # Esquisse20 → Enlèv. mat.-Extru.7 (cut, two sides: drawn at the far end of the back side and taken through both)
    with BuildSketch(Plane(origin=(0, 19.971790504, 1.747305259), x_dir=(-1, 0, 0), z_dir=(0, -0.9961946980917459, -0.08715574274765504)).offset(-ENL_V_MAT_EXTRU_7_DEPTH_BACK)):
        with BuildLine():
            Line((-27.391860643, -19.597109246), (-22.029549541, -15.097595978))
            Line((-22.029549541, -15.097595978), (-18.333520785, -19.502351526))
            Line((-18.333520785, -19.502351526), (-16.035387456, -17.573988697))
            Line((-16.035387456, -17.573988697), (-11.535874188, -22.936299798))
            Line((-11.535874188, -22.936299798), (-13.834007517, -24.864662627))
            Line((-13.834007517, -24.864662627), (-10.137978762, -29.269418175))
            Line((-10.137978762, -29.269418175), (-15.500289863, -33.768931443))
            ThreePointArc((-15.500289863, -33.768931443), (-41.107644425, -43.181035785), (-27.391860643, -19.597109246))
        make_face()
    extrude(amount=ENL_V_MAT_EXTRU_7_DEPTH + ENL_V_MAT_EXTRU_7_DEPTH_BACK, mode=Mode.SUBTRACT)

    # Boss.-Extru.7: up to this plane
    boss_extru_7_end = Plane(origin=(0, 17.5, 0), z_dir=(0, -1, 0))
    # Esquisse21 → Boss.-Extru.7 (add, up to the surface)
    with BuildSketch(Plane(origin=(0, 30.182786159, 2.640651623), x_dir=(1, 0, 0), z_dir=(0, 0.9961946980917459, 0.08715574274765506)), mode=Mode.PRIVATE) as boss_extru_7_sk1:
        with BuildLine():
            Line((45, -17.766740163), (45, -23.698941557))
            ThreePointArc((45, -23.698941557), (43.651360309, -25.589901564), (41.424270252, -24.930637851))
            ThreePointArc((41.424270252, -24.930637851), (35.151897103, -20.306412891), (27.391570779, -19.596866021))
            Line((27.391570779, -19.596866021), (22.029549541, -15.097595978))
            Line((22.029549541, -15.097595978), (18.333520785, -19.502351526))
            Line((18.333520785, -19.502351526), (16.035387456, -17.573988697))
            Line((16.035387456, -17.573988697), (15.5, -18.21203862))
            Line((15.5, -18.21203862), (15.5, -17.314835875))
            ThreePointArc((15.5, -17.314835875), (30.336978295, -11.862904945), (45, -17.766740163))
        make_face()
    boss_extru_7_tool1 = split(extrude(boss_extru_7_sk1.sketch, amount=-BOSS_EXTRU_7_REACH, mode=Mode.PRIVATE), bisect_by=boss_extru_7_end, keep=Keep.BOTH, mode=Mode.PRIVATE)
    add(boss_extru_7_tool1.solids().sort_by_distance((33.379868, 28.680034, 19.81719))[0])
    # Esquisse21 → Boss.-Extru.7 (add, up to the surface)
    with BuildSketch(Plane(origin=(0, 30.182786159, 2.640651623), x_dir=(1, 0, 0), z_dir=(0, 0.9961946980917459, 0.08715574274765506)), mode=Mode.PRIVATE) as boss_extru_7_sk2:
        with BuildLine():
            Line((10.5, -29.573190063), (15.5, -33.768688219))
            ThreePointArc((15.5, -33.768688219), (18.715242473, -42.966256453), (27.025625699, -48.052569085))
            ThreePointArc((27.025625699, -48.052569085), (30.893678772, -53.971873557), (24.974374301, -57.839926629))
            ThreePointArc((24.974374301, -57.839926629), (16.912185529, -54.572288263), (10.5, -48.693493741))
            Line((10.5, -48.693493741), (10.5, -29.573190063))
        make_face()
    boss_extru_7_tool2 = split(extrude(boss_extru_7_sk2.sketch, amount=-BOSS_EXTRU_7_REACH, mode=Mode.PRIVATE), bisect_by=boss_extru_7_end, keep=Keep.BOTH, mode=Mode.PRIVATE)
    add(boss_extru_7_tool2.solids().sort_by_distance((18.76179, 26.065697, 49.699201))[0])
    # Esquisse21 → Boss.-Extru.7 (add, up to the surface)
    with BuildSketch(Plane(origin=(0, 30.182786159, 2.640651623), x_dir=(1, 0, 0), z_dir=(0, 0.9961946980917459, 0.08715574274765506)), mode=Mode.PRIVATE) as boss_extru_7_sk3:
        with BuildLine():
            Line((13.834007517, -24.864662627), (11.111680089, -22.580358687))
            ThreePointArc((11.111680089, -22.580358687), (10.798049448, -23.122928702), (10.5, -23.674211684))
            Line((10.5, -23.674211684), (10.5, -28.837978064))
            Line((10.5, -28.837978064), (13.834007517, -24.864662627))
        make_face()
    boss_extru_7_tool3 = split(extrude(boss_extru_7_sk3.sketch, amount=-BOSS_EXTRU_7_REACH, mode=Mode.PRIVATE), bisect_by=boss_extru_7_end, keep=Keep.BOTH, mode=Mode.PRIVATE)
    add(boss_extru_7_tool3.solids().sort_by_distance((11.652065, 27.971813, 27.912185))[0])

    # Esquisse22 → Enlèv. mat.-Extru.8 (cut)
    with BuildSketch(Plane(origin=(0, 30.182786159, 2.640651623), x_dir=(1, 0, 0), z_dir=(0, 0.9961946980917459, 0.08715574274765506))):
        with Locations(Location((41.24878317, -20.45483769, 0), (0, 0, 270))):
            Circle(ESQUISSE22_R)
        with Locations(Location((18.75121683, -47.266393199, 0), (0, 0, 270))):
            Circle(ESQUISSE22_R)
    extrude(amount=-ENL_V_MAT_EXTRU_8_DEPTH, mode=Mode.SUBTRACT)

    # Esquisse23 → Boss.-Extru.8 (add)
    with BuildSketch(Plane(origin=(0, 30.182786159, 2.640651623), x_dir=(1, 0, 0), z_dir=(0, 0.9961946980917459, 0.08715574274765506))):
        with Locations(Location((26, -53.274774502, 0), (0, 0, 270))):
            Circle(ESQUISSE23_R)
    extrude(amount=BOSS_EXTRU_8_DEPTH)

    # Esquisse24 → Boss.-Extru.9 (add)
    with BuildSketch(Plane(origin=(0, 34.067945482, 2.980559019), x_dir=(1, 0, 0), z_dir=(0, 0.9961946980917459, 0.08715574274765506))):
        with Locations(Location((26, -53.274774502, 0), (0, 0, 270))):
            Circle(ESQUISSE24_R)
    extrude(amount=BOSS_EXTRU_9_DEPTH)

    # Boss.-Extru.10: up to this face of the body (flat: up to its plane)
    boss_extru_10_end = Plane(part.part.faces().sort_by_distance((20.5, 9.818956663, -53.144597734))[0])
    # Esquisse25 → Boss.-Extru.10 (add, up to the picked face)
    with BuildSketch(Plane(origin=(0, 0, 0), x_dir=(0, 0, -1), z_dir=(1, 0, 0)), mode=Mode.PRIVATE) as boss_extru_10_sk1:
        Polygon((66.930934552, 5.5), (78.930934552, 17.5), (66.930934552, 17.5), align=None)
    boss_extru_10_tool1 = split(extrude(boss_extru_10_sk1.sketch, amount=BOSS_EXTRU_10_REACH, mode=Mode.PRIVATE), bisect_by=boss_extru_10_end, keep=Keep.BOTH, mode=Mode.PRIVATE)
    add(boss_extru_10_tool1.solids().sort_by(Axis((0, 13.5, -70.930935), (1, 0, 0)))[0])

    # Boss.-Extru.10 direction 2: up to this face of the body (flat: up to its plane)
    boss_extru_10_direction_2_end = Plane(part.part.faces().sort_by_distance((-20.5, 9.818956663, -53.144597734))[0])
    # Esquisse25 → Boss.-Extru.10 direction 2 (add, up to the picked face)
    with BuildSketch(Plane(origin=(0, 0, 0), x_dir=(0, 0, -1), z_dir=(1, 0, 0)), mode=Mode.PRIVATE) as boss_extru_10_direction_2_sk1:
        Polygon((66.930934552, 5.5), (78.930934552, 17.5), (66.930934552, 17.5), align=None)
    boss_extru_10_direction_2_tool1 = split(extrude(boss_extru_10_direction_2_sk1.sketch, amount=-BOSS_EXTRU_10_DIRECTION_2_REACH, mode=Mode.PRIVATE), bisect_by=boss_extru_10_direction_2_end, keep=Keep.BOTH, mode=Mode.PRIVATE)
    add(boss_extru_10_direction_2_tool1.solids().sort_by(Axis((0, 13.5, -70.930935), (-1, 0, 0)))[0])

    # Esquisse26 → Enlèv. mat.-Extru.10 (cut, two sides: drawn at the far end of the back side and taken through both)
    with BuildSketch(Plane(origin=(0, 0, 0), x_dir=(0, 0, -1), z_dir=(1, 0, 0)).offset(-ENL_V_MAT_EXTRU_10_DEPTH_BACK)):
        Polygon((66.930934552, 5.5), (78.930934552, 17.5), (66.930934552, 17.5), align=None)
    extrude(amount=ENL_V_MAT_EXTRU_10_DEPTH + ENL_V_MAT_EXTRU_10_DEPTH_BACK, mode=Mode.SUBTRACT)

    # Enlèv. mat.-Extru.11: up to this face of the body (flat: up to its plane)
    enl_v_mat_extru_11_end = Plane(part.part.faces().sort_by_distance((0, 17.246713455, 1.5))[0])
    # Esquisse27 → Enlèv. mat.-Extru.11 (cut, up to the picked face)
    with BuildSketch(Plane(origin=(0, 0, -66.930934552), x_dir=(-1, 0, 0), z_dir=(0, 0, -1)), mode=Mode.PRIVATE) as enl_v_mat_extru_11_sk1:
        with Locations((0, 7.730859659)):
            Rectangle(ESQUISSE27_W, ESQUISSE27_H)
    enl_v_mat_extru_11_tool1 = split(extrude(enl_v_mat_extru_11_sk1.sketch, amount=-ENL_V_MAT_EXTRU_11_REACH, mode=Mode.PRIVATE), bisect_by=enl_v_mat_extru_11_end, keep=Keep.BOTH, mode=Mode.PRIVATE)
    add(enl_v_mat_extru_11_tool1.solids().sort_by(Axis((0, 7.73086, -66.930935), (0, 0, 1)))[0], mode=Mode.SUBTRACT)

    # Chanfrein4
    chanfrein4_edges = [part.edges().sort_by_distance(p)[0] for p in [
        (-1, 15.461719317, -34.215467276),
        (1, 15.461719317, -34.215467276),
    ]]
    chamfer(chanfrein4_edges, length=CHANFREIN4_SIZE - 0.0001)  # a hair under: the kernel refuses the full size


solid = part.part
